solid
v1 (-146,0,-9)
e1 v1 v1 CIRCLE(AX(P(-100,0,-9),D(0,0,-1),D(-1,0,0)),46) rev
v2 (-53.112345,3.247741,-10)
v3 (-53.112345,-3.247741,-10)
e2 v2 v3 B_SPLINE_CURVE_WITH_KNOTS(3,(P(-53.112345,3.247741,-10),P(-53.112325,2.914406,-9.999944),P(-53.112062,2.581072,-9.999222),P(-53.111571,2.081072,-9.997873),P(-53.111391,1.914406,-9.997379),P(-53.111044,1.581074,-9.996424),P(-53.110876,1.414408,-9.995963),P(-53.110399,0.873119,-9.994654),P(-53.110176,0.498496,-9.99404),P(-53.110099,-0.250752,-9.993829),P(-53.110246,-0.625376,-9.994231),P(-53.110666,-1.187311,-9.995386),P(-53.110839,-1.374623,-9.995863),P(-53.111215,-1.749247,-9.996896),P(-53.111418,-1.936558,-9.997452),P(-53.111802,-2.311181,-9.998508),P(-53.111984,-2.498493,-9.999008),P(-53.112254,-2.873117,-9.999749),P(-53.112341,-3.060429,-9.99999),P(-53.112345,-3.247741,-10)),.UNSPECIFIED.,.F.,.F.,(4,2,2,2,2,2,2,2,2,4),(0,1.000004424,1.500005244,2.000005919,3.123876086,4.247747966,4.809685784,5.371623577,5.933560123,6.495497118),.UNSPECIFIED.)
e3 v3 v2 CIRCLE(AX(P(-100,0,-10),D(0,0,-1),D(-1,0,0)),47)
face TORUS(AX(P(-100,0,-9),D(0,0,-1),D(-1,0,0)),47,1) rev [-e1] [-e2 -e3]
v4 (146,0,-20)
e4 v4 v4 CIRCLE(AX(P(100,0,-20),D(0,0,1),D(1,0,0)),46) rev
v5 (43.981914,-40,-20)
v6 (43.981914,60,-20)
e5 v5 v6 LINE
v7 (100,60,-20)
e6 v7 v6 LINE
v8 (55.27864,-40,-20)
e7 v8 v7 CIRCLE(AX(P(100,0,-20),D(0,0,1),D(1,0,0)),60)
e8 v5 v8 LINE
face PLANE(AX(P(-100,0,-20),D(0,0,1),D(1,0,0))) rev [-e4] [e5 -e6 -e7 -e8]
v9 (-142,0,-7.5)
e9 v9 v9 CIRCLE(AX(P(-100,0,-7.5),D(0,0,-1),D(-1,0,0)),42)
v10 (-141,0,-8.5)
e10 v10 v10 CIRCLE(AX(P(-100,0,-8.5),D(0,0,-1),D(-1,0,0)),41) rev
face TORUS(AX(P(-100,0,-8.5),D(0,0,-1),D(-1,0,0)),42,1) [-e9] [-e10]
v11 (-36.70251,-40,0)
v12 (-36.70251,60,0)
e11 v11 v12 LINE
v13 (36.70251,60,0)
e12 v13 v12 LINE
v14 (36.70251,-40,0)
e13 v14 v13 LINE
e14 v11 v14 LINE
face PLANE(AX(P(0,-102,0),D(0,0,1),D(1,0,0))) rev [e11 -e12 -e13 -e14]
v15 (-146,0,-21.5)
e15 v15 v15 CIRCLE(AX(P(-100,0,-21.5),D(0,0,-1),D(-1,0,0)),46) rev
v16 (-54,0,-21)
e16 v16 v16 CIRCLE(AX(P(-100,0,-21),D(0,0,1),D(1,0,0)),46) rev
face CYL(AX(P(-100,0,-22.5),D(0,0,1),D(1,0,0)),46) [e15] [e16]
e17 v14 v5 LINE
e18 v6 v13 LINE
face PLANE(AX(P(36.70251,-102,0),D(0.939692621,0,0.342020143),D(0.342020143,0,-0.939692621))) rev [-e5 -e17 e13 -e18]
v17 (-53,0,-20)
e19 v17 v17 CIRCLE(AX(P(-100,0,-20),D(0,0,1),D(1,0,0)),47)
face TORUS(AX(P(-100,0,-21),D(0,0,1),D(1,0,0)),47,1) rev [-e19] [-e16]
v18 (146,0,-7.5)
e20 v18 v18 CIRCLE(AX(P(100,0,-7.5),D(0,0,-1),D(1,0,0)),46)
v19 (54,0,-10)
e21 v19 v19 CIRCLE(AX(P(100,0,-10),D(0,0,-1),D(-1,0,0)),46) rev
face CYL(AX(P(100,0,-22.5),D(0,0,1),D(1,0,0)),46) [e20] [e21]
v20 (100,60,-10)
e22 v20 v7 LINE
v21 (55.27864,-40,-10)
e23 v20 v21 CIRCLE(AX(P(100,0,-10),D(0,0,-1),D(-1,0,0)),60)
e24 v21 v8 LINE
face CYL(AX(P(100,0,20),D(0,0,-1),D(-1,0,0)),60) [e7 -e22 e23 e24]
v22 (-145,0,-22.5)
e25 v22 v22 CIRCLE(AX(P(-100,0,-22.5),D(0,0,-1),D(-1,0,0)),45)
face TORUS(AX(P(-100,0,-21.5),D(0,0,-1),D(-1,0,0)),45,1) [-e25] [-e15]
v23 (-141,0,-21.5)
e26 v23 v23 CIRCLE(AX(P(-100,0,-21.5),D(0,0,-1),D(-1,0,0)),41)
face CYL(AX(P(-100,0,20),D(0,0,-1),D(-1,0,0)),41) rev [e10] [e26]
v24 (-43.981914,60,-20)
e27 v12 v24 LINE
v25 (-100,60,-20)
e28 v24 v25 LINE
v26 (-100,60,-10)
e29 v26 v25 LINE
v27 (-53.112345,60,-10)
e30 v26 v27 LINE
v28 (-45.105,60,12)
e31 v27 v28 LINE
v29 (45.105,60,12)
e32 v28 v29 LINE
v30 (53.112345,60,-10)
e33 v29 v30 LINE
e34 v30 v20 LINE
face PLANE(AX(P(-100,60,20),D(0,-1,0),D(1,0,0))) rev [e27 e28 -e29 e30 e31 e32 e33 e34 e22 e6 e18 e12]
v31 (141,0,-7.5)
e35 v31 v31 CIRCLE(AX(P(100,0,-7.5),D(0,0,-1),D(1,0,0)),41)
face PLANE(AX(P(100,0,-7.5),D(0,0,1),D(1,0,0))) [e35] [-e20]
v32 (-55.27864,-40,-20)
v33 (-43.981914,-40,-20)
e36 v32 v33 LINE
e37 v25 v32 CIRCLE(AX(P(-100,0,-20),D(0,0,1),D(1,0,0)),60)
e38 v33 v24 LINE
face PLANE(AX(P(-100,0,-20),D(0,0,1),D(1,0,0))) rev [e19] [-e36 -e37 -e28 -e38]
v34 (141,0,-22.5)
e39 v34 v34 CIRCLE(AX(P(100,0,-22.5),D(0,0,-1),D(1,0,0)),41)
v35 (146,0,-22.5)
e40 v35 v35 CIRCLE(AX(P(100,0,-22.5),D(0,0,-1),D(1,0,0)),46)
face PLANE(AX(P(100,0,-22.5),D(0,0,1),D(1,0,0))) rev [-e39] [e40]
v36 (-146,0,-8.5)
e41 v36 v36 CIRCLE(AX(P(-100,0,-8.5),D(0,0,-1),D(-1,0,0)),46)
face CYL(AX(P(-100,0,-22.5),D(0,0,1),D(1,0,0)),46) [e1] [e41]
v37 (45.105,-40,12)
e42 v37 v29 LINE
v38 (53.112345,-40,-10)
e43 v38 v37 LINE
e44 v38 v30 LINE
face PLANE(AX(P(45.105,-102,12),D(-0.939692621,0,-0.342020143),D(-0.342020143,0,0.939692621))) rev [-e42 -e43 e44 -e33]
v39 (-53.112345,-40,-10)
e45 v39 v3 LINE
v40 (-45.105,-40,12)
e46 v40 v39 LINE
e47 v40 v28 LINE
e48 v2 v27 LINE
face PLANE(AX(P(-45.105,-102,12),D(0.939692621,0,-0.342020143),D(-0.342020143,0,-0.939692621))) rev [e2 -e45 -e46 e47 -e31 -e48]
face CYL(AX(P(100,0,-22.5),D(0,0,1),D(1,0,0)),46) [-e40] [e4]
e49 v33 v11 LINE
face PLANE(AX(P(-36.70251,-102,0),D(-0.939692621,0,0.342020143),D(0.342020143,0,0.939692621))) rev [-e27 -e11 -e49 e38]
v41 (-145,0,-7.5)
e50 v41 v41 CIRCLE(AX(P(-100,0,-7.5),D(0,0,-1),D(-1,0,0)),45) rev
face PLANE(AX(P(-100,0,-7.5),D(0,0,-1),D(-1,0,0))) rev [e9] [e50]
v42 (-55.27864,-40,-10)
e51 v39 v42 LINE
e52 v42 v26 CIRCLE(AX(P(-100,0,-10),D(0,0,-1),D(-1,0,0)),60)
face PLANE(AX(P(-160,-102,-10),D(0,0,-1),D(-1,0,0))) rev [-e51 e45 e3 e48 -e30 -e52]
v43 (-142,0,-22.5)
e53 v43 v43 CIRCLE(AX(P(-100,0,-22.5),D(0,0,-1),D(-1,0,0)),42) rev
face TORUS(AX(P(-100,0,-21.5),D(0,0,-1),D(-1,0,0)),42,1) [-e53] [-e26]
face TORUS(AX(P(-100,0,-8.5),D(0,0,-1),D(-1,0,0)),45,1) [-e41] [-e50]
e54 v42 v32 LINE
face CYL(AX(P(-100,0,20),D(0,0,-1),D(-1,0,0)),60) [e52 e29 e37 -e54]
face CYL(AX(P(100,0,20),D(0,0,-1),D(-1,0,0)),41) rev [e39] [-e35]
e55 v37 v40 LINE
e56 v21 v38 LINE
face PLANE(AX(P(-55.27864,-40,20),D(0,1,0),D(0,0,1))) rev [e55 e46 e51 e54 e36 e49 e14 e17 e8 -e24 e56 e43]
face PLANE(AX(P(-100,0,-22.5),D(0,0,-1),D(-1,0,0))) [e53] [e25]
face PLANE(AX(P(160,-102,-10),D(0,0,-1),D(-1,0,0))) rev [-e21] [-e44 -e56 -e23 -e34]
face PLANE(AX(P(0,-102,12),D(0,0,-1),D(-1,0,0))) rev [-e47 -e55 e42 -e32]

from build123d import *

# Parameters (mm, degrees)
SKETCH1_R           = 41
BOSS_EXTRUDE1_DEPTH = 20
CUT_EXTRUDE1_DEPTH  = 102
SKETCH3_R           = 46
SKETCH3_R_2         = 41
BOSS_EXTRUDE2_DEPTH = 7.5
FILLET1_R           = 1


with BuildPart() as part:
    # Sketch1 → Boss-Extrude1 (new, symmetric)
    with BuildSketch(Plane.XY):
        with BuildLine():
            Line((-100, 60), (100, 60))
            ThreePointArc((100, 60), (154.772255751, -24.494897428), (55.27864045, -40))
            Line((55.27864045, -40), (-55.27864045, -40))
            ThreePointArc((-55.27864045, -40), (-154.772255751, -24.494897428), (-100, 60))
        make_face()
        with Locations((100, 0)):
            Circle(SKETCH1_R, mode=Mode.SUBTRACT)
        with Locations(Location((-100, 0, 0), (0, 0, 180))):
            Circle(SKETCH1_R, mode=Mode.SUBTRACT)
    extrude(amount=BOSS_EXTRUDE1_DEPTH, both=True)

    # Sketch2 → Cut-Extrude1 (cut, symmetric)
    with BuildSketch(Plane(origin=(0, 0, 0), x_dir=(1, 0, 0), z_dir=(0, 1, 0))):
        Polygon((0, 0), (-36.702509541, 0), (-43.981914227, 20), (43.981914227, 20), (36.702509541, 0), align=None)
        Polygon((0, -12), (-45.105, -12), (-53.112345154, 10), (-160, 10), (-160, -20), (160, -20), (160, 10), (53.112345154, 10), (45.105, -12), align=None)
    extrude(amount=CUT_EXTRUDE1_DEPTH, both=True, mode=Mode.SUBTRACT)

    # Sketch3 → Boss-Extrude2 (add, symmetric)
    # profile 1 of 2: a face of its own
    with BuildSketch(Plane(origin=(0, 0, -15), x_dir=(-1, 0, 0), z_dir=(0, 0, -1))):
        with Locations((100, 0)):
            Circle(SKETCH3_R)
        with Locations((100, 0)):
            Circle(SKETCH3_R_2, mode=Mode.SUBTRACT)
    # profile 2 of 2: a face of its own
    with BuildSketch(Plane(origin=(0, 0, -15), x_dir=(-1, 0, 0), z_dir=(0, 0, -1))):
        with Locations(Location((-100, 0, 0), (0, 0, 180))):
            Circle(SKETCH3_R)
        with Locations(Location((-100, 0, 0), (0, 0, 180))):
            Circle(SKETCH3_R_2, mode=Mode.SUBTRACT)
    extrude(amount=BOSS_EXTRUDE2_DEPTH, both=True)

    # Fillet1
    # the kernel refuses this fillet: 1 mm, written as the material it adds along each edge
    with BuildSketch(Plane(origin=(-100, 0, -10), x_dir=(-1, 0, 0), z_dir=(0, -1, 0))) as fillet1_piece_1:
        with BuildLine():
            CenterArc((46 + FILLET1_R, -FILLET1_R), FILLET1_R, 90, 90)
            Line((46 + FILLET1_R, 0), (46, 0))
            Line((46, 0), (46, -FILLET1_R))
        make_face()
    revolve(axis=Axis((-100, 0, -10), (0, 0, -1)))
    with BuildSketch(Plane(origin=(-100, 0, -20), x_dir=(-1, 0, 0), z_dir=(0, -1, 0))) as fillet1_piece_2:
        with BuildLine():
            CenterArc((46 + FILLET1_R, FILLET1_R), FILLET1_R, 180, 90)
            Line((46, FILLET1_R), (46, 0))
            Line((46, 0), (46 + FILLET1_R, 0))
        make_face()
    revolve(axis=Axis((-100, 0, -20), (0, 0, -1)))
    # the kernel refuses this fillet: 1 mm, written as the material it takes off along each edge
    with BuildSketch(Plane(origin=(-100, 0, -7.5), x_dir=(-1, 0, 0), z_dir=(0, -1, 0))) as fillet1_2_piece_1:
        with BuildLine():
            CenterArc((46 - FILLET1_R, FILLET1_R), FILLET1_R, 270, 90)
            Line((46 - FILLET1_R, 0), (46, 0))
            Line((46, 0), (46, FILLET1_R))
        make_face()
    revolve(axis=Axis((-100, 0, -7.5), (0, 0, -1)), mode=Mode.SUBTRACT)
    with BuildSketch(Plane(origin=(-100, 0, -22.5), x_dir=(-1, 0, 0), z_dir=(0, -1, 0))) as fillet1_2_piece_2:
        with BuildLine():
            CenterArc((41 + FILLET1_R, -FILLET1_R), FILLET1_R, 90, 90)
            Line((41, -FILLET1_R), (41, 0))
            Line((41, 0), (41 + FILLET1_R, 0))
        make_face()
    revolve(axis=Axis((-100, 0, -22.5), (0, 0, -1)), mode=Mode.SUBTRACT)
    with BuildSketch(Plane(origin=(-100, 0, -22.5), x_dir=(-1, 0, 0), z_dir=(0, -1, 0))) as fillet1_2_piece_3:
        with BuildLine():
            CenterArc((46 - FILLET1_R, -FILLET1_R), FILLET1_R, 0, 90)
            Line((46 - FILLET1_R, 0), (46, 0))
            Line((46, 0), (46, -FILLET1_R))
        make_face()
    revolve(axis=Axis((-100, 0, -22.5), (0, 0, -1)), mode=Mode.SUBTRACT)
    with BuildSketch(Plane(origin=(-100, 0, -7.5), x_dir=(-1, 0, 0), z_dir=(0, -1, 0))) as fillet1_2_piece_4:
        with BuildLine():
            CenterArc((41 + FILLET1_R, FILLET1_R), FILLET1_R, 180, 90)
            Line((41, FILLET1_R), (41, 0))
            Line((41, 0), (41 + FILLET1_R, 0))
        make_face()
    revolve(axis=Axis((-100, 0, -7.5), (0, 0, -1)), mode=Mode.SUBTRACT)


solid = part.part
